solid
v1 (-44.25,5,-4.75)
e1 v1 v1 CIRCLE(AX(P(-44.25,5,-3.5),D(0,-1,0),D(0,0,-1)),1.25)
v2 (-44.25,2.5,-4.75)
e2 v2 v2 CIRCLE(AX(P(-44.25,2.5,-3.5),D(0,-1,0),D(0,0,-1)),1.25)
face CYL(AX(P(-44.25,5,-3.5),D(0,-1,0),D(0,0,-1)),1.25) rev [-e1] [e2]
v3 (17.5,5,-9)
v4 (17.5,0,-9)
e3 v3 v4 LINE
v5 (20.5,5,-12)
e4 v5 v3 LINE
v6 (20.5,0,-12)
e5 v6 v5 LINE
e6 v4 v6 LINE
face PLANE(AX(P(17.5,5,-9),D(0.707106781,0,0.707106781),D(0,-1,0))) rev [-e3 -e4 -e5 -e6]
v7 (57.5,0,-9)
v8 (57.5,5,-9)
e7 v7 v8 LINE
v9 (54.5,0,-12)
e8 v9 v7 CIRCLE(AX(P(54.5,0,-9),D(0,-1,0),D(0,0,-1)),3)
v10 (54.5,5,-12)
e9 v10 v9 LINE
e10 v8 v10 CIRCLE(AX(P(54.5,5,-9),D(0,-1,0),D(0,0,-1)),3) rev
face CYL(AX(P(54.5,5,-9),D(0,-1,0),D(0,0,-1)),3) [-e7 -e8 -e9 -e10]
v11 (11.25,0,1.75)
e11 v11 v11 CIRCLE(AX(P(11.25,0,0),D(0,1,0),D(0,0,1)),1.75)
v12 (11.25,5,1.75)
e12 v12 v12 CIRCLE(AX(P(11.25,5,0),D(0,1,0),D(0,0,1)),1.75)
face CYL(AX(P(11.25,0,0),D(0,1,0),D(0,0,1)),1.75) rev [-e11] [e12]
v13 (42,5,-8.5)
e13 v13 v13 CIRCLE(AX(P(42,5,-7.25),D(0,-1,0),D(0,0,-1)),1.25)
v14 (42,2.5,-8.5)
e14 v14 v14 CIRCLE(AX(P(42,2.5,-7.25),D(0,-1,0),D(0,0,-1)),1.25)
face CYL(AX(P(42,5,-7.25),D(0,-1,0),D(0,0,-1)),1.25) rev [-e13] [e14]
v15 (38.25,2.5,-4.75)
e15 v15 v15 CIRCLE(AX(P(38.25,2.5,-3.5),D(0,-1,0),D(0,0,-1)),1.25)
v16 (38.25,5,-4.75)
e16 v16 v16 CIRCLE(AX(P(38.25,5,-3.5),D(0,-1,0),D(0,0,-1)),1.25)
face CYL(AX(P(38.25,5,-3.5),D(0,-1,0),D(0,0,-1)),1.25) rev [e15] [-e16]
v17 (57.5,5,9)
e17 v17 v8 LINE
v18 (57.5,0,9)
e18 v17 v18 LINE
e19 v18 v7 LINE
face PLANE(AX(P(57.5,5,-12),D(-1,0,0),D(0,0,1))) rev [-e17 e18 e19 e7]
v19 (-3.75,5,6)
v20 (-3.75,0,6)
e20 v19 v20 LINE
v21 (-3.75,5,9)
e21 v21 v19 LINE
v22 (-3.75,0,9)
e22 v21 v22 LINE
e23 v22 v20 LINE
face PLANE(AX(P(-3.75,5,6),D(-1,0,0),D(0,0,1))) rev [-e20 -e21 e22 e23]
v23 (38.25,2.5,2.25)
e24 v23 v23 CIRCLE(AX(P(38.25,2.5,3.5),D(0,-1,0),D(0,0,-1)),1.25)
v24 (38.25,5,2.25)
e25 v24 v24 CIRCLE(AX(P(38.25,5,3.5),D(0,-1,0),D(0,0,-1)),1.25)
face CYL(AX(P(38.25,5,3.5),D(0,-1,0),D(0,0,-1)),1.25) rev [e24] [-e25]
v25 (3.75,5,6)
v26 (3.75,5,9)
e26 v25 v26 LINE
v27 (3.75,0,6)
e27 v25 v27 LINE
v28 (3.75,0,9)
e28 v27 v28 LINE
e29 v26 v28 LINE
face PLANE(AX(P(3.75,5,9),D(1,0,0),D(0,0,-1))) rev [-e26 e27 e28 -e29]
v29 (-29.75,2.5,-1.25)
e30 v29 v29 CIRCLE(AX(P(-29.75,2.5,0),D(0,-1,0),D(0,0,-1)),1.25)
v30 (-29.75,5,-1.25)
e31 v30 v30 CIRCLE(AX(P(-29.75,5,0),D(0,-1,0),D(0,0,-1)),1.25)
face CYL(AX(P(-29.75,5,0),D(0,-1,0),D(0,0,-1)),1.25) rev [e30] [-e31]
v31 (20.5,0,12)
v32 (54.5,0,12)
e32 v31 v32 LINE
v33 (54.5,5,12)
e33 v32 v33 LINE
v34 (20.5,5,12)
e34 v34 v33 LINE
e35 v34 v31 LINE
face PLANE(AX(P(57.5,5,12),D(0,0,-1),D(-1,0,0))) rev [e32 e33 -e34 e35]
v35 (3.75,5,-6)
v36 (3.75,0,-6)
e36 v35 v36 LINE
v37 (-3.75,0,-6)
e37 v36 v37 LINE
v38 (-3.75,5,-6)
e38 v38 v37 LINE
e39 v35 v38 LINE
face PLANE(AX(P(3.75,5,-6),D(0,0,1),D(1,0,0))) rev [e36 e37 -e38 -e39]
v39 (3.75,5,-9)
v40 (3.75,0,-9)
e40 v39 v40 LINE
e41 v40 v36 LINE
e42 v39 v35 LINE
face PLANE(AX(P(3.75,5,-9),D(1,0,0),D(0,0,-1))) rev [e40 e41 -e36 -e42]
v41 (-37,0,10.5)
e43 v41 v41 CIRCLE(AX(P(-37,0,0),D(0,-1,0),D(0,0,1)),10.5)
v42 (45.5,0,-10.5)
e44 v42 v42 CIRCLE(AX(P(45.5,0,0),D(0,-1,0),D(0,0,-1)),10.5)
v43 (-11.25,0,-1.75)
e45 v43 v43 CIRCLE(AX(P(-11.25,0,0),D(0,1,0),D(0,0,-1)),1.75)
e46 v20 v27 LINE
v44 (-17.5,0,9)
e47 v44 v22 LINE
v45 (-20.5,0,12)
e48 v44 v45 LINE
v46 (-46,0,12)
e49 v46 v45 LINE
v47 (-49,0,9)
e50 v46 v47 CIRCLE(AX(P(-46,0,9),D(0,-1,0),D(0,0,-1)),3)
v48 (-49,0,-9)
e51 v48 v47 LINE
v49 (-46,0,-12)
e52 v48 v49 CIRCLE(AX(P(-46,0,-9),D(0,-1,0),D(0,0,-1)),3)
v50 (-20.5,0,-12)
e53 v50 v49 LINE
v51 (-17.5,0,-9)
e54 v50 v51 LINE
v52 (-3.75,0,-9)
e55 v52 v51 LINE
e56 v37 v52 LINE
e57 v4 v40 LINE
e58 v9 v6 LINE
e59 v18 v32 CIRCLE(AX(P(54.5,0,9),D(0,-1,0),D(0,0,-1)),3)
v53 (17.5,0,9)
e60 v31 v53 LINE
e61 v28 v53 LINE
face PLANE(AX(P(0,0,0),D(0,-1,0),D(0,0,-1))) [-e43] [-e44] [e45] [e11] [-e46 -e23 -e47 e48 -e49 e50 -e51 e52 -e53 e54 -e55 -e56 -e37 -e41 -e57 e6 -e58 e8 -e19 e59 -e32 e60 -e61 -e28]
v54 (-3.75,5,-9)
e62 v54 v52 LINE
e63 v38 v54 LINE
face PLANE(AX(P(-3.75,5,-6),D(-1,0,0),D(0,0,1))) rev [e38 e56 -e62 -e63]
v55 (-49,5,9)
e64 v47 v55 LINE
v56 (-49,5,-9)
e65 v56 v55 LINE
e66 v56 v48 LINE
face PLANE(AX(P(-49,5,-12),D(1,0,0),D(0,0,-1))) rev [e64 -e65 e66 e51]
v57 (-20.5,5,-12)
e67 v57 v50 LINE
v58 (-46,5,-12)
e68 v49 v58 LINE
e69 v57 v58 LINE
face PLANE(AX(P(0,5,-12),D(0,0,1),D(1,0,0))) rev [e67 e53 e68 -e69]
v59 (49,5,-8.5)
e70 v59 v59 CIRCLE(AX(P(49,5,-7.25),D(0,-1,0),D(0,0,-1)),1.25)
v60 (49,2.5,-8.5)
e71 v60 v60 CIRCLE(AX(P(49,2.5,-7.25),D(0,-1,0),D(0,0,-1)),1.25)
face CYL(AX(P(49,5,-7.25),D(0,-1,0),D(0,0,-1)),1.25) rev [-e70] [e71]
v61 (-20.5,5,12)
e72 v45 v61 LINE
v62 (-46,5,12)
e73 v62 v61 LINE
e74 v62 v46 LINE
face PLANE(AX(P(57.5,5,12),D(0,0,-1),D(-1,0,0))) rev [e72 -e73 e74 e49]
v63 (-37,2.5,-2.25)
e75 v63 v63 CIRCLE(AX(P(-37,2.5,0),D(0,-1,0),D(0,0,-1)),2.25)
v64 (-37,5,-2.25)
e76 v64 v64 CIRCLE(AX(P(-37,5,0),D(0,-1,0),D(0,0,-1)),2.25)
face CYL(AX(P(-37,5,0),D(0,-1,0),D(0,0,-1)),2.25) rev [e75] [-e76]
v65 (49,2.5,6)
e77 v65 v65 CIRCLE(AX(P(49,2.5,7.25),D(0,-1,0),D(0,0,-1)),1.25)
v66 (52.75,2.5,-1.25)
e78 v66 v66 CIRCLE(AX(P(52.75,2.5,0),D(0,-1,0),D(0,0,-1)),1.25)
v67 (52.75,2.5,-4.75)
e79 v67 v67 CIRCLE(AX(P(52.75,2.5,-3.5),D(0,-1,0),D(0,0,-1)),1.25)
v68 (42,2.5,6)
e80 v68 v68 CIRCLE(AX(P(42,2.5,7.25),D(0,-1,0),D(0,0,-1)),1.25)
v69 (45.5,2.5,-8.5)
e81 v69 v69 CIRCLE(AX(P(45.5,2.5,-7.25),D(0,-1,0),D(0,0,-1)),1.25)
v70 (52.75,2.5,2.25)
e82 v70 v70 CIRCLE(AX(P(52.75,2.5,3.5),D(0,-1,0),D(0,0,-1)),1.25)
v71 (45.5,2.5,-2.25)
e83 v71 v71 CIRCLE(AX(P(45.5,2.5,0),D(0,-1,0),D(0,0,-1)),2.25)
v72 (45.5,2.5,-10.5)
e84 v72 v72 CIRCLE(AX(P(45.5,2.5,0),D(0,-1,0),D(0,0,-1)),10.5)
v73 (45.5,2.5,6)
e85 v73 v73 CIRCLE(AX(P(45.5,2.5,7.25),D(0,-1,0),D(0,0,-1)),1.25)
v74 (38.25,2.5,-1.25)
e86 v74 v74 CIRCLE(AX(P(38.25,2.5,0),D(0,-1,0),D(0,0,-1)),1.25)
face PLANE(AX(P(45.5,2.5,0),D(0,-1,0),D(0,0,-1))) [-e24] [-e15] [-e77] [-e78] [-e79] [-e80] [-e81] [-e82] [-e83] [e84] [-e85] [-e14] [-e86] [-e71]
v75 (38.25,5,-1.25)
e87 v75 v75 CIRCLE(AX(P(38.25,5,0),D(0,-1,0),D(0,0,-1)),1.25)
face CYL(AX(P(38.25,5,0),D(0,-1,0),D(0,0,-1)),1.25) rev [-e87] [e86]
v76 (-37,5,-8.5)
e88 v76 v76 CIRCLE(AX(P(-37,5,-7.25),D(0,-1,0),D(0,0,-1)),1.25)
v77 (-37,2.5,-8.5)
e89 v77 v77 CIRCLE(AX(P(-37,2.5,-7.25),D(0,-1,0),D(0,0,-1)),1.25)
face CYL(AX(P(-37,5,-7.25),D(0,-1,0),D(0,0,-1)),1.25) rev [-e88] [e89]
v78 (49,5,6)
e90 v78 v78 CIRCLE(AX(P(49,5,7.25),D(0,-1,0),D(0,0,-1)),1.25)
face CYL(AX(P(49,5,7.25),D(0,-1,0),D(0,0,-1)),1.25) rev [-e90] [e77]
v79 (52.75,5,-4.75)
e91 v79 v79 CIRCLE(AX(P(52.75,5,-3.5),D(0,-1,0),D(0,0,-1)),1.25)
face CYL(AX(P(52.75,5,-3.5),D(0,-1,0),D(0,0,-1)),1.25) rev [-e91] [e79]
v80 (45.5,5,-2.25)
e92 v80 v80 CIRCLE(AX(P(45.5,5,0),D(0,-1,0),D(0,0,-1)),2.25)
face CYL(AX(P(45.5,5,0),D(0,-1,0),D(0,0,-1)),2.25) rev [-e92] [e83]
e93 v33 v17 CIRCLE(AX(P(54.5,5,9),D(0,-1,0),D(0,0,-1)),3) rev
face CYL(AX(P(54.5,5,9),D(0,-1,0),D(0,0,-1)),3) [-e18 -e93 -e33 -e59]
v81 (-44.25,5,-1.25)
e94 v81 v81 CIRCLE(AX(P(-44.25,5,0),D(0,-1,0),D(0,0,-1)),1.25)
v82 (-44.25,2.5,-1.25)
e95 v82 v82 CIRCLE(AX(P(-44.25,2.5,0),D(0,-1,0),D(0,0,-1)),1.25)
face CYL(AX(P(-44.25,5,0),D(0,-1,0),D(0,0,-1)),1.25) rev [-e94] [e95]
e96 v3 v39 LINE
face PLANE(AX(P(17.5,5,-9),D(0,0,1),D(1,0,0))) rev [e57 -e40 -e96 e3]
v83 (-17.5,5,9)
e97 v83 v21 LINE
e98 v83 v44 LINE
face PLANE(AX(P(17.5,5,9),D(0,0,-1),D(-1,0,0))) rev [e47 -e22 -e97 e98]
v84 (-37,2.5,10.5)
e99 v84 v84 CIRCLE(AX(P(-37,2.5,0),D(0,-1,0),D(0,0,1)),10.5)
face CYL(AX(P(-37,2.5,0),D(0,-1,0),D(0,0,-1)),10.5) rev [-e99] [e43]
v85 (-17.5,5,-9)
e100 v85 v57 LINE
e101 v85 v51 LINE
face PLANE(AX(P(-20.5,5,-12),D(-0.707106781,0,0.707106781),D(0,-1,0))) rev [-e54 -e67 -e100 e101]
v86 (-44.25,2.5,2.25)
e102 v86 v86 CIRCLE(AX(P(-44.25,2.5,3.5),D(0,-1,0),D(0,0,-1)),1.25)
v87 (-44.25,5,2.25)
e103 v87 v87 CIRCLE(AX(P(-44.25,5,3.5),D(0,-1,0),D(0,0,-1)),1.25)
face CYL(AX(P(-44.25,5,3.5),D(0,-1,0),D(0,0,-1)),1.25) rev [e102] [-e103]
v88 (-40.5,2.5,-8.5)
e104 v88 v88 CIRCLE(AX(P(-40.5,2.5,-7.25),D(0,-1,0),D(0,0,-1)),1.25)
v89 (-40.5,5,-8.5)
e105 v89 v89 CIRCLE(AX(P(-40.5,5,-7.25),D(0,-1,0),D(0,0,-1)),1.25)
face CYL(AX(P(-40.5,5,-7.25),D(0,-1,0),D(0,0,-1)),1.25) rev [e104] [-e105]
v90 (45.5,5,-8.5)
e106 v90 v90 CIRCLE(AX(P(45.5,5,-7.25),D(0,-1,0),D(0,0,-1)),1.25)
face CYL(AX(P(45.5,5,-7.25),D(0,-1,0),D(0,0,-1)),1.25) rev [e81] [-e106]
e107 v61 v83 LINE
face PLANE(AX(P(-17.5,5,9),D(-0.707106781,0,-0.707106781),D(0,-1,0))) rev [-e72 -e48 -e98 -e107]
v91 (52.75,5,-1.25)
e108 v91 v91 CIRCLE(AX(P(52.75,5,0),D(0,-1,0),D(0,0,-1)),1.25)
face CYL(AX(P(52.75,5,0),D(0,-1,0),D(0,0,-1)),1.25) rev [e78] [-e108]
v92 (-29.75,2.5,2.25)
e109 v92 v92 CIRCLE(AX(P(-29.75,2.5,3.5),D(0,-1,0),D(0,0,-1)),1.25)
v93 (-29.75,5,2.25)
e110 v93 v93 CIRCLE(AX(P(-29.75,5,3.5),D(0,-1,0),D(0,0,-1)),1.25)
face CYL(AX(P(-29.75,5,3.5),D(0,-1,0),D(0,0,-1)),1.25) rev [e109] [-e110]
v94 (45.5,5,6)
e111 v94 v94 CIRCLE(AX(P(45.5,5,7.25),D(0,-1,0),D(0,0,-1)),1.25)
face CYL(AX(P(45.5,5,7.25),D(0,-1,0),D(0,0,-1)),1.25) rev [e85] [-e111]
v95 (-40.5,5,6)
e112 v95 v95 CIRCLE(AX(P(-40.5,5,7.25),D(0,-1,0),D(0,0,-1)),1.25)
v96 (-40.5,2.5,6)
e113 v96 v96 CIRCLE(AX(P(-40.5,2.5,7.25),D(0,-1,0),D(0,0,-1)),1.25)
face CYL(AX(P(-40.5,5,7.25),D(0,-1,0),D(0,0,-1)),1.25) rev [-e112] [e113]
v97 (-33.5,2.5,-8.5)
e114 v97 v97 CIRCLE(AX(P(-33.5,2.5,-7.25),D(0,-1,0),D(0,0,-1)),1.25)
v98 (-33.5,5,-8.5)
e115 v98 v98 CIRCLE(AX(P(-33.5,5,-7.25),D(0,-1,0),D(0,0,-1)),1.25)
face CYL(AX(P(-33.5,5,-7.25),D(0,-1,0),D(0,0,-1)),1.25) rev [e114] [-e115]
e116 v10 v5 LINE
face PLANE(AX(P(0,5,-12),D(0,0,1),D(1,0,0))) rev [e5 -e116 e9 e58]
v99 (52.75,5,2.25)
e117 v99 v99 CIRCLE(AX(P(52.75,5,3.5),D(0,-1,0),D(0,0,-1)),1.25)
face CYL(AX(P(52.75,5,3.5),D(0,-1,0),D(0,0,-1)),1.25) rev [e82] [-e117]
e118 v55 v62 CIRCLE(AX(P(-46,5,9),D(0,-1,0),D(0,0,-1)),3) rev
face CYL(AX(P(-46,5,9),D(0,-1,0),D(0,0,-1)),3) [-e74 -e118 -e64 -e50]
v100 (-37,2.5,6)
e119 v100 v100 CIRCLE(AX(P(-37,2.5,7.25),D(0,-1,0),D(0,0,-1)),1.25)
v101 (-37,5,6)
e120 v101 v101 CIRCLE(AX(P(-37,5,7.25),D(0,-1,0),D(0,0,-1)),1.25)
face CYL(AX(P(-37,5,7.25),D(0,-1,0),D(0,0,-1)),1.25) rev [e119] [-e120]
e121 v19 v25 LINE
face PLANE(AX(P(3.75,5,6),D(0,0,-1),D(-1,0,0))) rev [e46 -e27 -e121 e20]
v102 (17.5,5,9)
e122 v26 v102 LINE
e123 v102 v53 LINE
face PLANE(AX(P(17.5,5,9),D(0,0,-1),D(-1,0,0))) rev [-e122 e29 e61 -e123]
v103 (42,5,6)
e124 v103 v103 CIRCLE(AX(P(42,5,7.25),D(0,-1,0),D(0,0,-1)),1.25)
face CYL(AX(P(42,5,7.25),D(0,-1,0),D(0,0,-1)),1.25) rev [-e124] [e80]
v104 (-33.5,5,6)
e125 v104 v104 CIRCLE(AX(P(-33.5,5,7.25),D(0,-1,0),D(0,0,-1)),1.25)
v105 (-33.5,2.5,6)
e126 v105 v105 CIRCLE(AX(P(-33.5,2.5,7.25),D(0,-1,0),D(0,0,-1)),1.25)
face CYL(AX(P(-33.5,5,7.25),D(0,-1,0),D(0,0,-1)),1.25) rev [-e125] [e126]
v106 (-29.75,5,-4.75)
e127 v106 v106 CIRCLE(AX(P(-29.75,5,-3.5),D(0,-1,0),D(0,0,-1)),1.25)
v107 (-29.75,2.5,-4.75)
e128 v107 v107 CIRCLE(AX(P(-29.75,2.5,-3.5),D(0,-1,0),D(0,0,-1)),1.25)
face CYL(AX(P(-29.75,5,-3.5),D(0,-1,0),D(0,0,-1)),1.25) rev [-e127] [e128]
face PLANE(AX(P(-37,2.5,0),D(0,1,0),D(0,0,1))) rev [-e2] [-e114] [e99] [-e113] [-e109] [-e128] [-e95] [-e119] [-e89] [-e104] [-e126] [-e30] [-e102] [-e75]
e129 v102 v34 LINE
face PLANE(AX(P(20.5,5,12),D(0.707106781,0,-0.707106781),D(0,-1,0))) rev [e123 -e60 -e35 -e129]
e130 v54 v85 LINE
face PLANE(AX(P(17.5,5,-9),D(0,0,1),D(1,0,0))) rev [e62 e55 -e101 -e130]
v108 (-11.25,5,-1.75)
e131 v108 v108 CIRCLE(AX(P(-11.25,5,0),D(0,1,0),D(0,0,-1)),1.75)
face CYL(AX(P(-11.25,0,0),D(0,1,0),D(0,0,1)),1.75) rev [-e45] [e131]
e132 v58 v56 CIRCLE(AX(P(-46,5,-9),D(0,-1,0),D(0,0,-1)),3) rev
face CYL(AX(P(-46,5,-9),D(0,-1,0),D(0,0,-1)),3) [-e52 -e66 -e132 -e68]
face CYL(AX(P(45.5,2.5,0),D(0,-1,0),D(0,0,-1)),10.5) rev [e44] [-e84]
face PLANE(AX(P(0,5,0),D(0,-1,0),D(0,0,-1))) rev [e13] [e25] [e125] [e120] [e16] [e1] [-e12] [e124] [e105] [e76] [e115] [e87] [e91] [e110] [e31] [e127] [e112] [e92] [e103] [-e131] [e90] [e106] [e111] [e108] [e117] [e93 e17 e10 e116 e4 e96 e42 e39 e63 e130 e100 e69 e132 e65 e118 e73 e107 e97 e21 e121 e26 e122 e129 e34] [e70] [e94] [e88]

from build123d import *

# Parameters (mm, degrees)
BOSS_EXTRUDE1_DEPTH = 5
SKETCH2_R           = 10.5
CUT_EXTRUDE1_DEPTH  = 2.5
SKETCH3_R           = 2.25
SKETCH3_R_2         = 1.25
CUT_EXTRUDE2_DEPTH  = 59.792006259
SKETCH7_W           = 35
SKETCH7_H           = 3
CUT_EXTRUDE4_DEPTH  = 59.951251047
SKETCH6_W           = 7.5
SKETCH6_H           = 3
CUT_EXTRUDE3_DEPTH  = 59.951251047
SKETCH8_R           = 1.75
CUT_EXTRUDE5_DEPTH  = 59.951251047
FILLET3_R           = 3
CHAMFER1_SIZE       = 3


with BuildPart() as part:
    # Sketch1 → Boss-Extrude1 (new body)
    with BuildSketch(Plane(origin=(0, 0, 0), x_dir=(1, 0, 0), z_dir=(0, 1, 0))):
        Polygon((0, 12), (57.5, 12), (57.5, -12), (0, -12), (-49, -12), (-49, 12), align=None)
    extrude(amount=BOSS_EXTRUDE1_DEPTH)

    # Sketch2 → Cut-Extrude1 (cut)
    with BuildSketch(Plane.XZ):
        with Locations(Location((45.5, 0, 0), (0, 0, 270))):
            Circle(SKETCH2_R)
        with Locations(Location((-37, 0, 0), (0, 0, 90))):
            Circle(SKETCH2_R)
    extrude(amount=-CUT_EXTRUDE1_DEPTH, mode=Mode.SUBTRACT)

    # Sketch3 → Cut-Extrude2 (cut, through all)
    with BuildSketch(Plane.XZ.offset(-2.5)):
        with Locations(Location((45.5, 0, 0), (0, 0, 270))):
            Circle(SKETCH3_R)
        with Locations(Location((45.5, 7.25, 0), (0, 0, 270))):
            Circle(SKETCH3_R_2)
        with Locations(Location((42, 7.25, 0), (0, 0, 270))):
            Circle(SKETCH3_R_2)
        with Locations(Location((49, 7.25, 0), (0, 0, 270))):
            Circle(SKETCH3_R_2)
        with Locations(Location((52.75, 0, 0), (0, 0, 270))):
            Circle(SKETCH3_R_2)
        with Locations(Location((52.75, -3.5, 0), (0, 0, 270))):
            Circle(SKETCH3_R_2)
        with Locations(Location((52.75, 3.5, 0), (0, 0, 270))):
            Circle(SKETCH3_R_2)
        with Locations(Location((45.5, -7.25, 0), (0, 0, 270))):
            Circle(SKETCH3_R_2)
        with Locations(Location((42, -7.25, 0), (0, 0, 270))):
            Circle(SKETCH3_R_2)
        with Locations(Location((49, -7.25, 0), (0, 0, 270))):
            Circle(SKETCH3_R_2)
        with Locations(Location((38.25, 0, 0), (0, 0, 270))):
            Circle(SKETCH3_R_2)
        with Locations(Location((38.25, 3.5, 0), (0, 0, 270))):
            Circle(SKETCH3_R_2)
        with Locations(Location((38.25, -3.5, 0), (0, 0, 270))):
            Circle(SKETCH3_R_2)
        with Locations(Location((-37, 0, 0), (0, 0, 270))):
            Circle(SKETCH3_R)
        with Locations(Location((-37, 7.25, 0), (0, 0, 270))):
            Circle(SKETCH3_R_2)
        with Locations(Location((-40.5, 7.25, 0), (0, 0, 270))):
            Circle(SKETCH3_R_2)
        with Locations(Location((-33.5, 7.25, 0), (0, 0, 270))):
            Circle(SKETCH3_R_2)
        with Locations(Location((-29.75, 3.5, 0), (0, 0, 270))):
            Circle(SKETCH3_R_2)
        with Locations(Location((-29.75, 0, 0), (0, 0, 270))):
            Circle(SKETCH3_R_2)
        with Locations(Location((-29.75, -3.5, 0), (0, 0, 270))):
            Circle(SKETCH3_R_2)
        with Locations(Location((-33.5, -7.25, 0), (0, 0, 270))):
            Circle(SKETCH3_R_2)
        with Locations(Location((-37, -7.25, 0), (0, 0, 270))):
            Circle(SKETCH3_R_2)
        with Locations(Location((-40.5, -7.25, 0), (0, 0, 270))):
            Circle(SKETCH3_R_2)
        with Locations(Location((-44.25, -3.5, 0), (0, 0, 270))):
            Circle(SKETCH3_R_2)
        with Locations(Location((-44.25, 0, 0), (0, 0, 270))):
            Circle(SKETCH3_R_2)
        with Locations(Location((-44.25, 3.5, 0), (0, 0, 270))):
            Circle(SKETCH3_R_2)
    extrude(amount=-CUT_EXTRUDE2_DEPTH, mode=Mode.SUBTRACT)

    # Sketch7 → Cut-Extrude4 (cut, through all)
    with BuildSketch(Plane.XZ):
        with Locations((0, 10.5)):
            Rectangle(SKETCH7_W, SKETCH7_H)
        with Locations((0, -10.5)):
            Rectangle(SKETCH7_W, SKETCH7_H)
    extrude(amount=-CUT_EXTRUDE4_DEPTH, mode=Mode.SUBTRACT)

    # Sketch6 → Cut-Extrude3 (cut, through all)
    with BuildSketch(Plane.XZ):
        with Locations((0, 7.5)):
            Rectangle(SKETCH6_W, SKETCH6_H)
        with Locations((0, -7.5)):
            Rectangle(SKETCH6_W, SKETCH6_H)
    extrude(amount=-CUT_EXTRUDE3_DEPTH, mode=Mode.SUBTRACT)

    # Sketch8 → Cut-Extrude5 (cut, through all)
    with BuildSketch(Plane(origin=(0, 5, 0), x_dir=(1, 0, 0), z_dir=(0, 1, 0))):
        with Locations(Location((11.25, 0, 0), (0, 0, 270))):
            Circle(SKETCH8_R)
        with Locations(Location((-11.25, 0, 0), (0, 0, 90))):
            Circle(SKETCH8_R)
    extrude(amount=-CUT_EXTRUDE5_DEPTH, mode=Mode.SUBTRACT)

    # Fillet3
    fillet3_edges = [part.edges().sort_by_distance(p)[0] for p in [
        (-49, 2.5, 12),
        (-49, 2.5, -12),
        (57.5, 2.5, -12),
        (57.5, 2.5, 12),
    ]]
    fillet(fillet3_edges, radius=FILLET3_R)

    # Chamfer1
    chamfer1_edges = [part.edges().sort_by_distance(p)[0] for p in [
        (-17.5, 2.5, 12),
        (17.5, 2.5, 12),
        (17.5, 2.5, -12),
        (-17.5, 2.5, -12),
    ]]
    chamfer(chamfer1_edges, length=CHAMFER1_SIZE - 0.0001)  # a hair under: the kernel refuses the full size


solid = part.part
